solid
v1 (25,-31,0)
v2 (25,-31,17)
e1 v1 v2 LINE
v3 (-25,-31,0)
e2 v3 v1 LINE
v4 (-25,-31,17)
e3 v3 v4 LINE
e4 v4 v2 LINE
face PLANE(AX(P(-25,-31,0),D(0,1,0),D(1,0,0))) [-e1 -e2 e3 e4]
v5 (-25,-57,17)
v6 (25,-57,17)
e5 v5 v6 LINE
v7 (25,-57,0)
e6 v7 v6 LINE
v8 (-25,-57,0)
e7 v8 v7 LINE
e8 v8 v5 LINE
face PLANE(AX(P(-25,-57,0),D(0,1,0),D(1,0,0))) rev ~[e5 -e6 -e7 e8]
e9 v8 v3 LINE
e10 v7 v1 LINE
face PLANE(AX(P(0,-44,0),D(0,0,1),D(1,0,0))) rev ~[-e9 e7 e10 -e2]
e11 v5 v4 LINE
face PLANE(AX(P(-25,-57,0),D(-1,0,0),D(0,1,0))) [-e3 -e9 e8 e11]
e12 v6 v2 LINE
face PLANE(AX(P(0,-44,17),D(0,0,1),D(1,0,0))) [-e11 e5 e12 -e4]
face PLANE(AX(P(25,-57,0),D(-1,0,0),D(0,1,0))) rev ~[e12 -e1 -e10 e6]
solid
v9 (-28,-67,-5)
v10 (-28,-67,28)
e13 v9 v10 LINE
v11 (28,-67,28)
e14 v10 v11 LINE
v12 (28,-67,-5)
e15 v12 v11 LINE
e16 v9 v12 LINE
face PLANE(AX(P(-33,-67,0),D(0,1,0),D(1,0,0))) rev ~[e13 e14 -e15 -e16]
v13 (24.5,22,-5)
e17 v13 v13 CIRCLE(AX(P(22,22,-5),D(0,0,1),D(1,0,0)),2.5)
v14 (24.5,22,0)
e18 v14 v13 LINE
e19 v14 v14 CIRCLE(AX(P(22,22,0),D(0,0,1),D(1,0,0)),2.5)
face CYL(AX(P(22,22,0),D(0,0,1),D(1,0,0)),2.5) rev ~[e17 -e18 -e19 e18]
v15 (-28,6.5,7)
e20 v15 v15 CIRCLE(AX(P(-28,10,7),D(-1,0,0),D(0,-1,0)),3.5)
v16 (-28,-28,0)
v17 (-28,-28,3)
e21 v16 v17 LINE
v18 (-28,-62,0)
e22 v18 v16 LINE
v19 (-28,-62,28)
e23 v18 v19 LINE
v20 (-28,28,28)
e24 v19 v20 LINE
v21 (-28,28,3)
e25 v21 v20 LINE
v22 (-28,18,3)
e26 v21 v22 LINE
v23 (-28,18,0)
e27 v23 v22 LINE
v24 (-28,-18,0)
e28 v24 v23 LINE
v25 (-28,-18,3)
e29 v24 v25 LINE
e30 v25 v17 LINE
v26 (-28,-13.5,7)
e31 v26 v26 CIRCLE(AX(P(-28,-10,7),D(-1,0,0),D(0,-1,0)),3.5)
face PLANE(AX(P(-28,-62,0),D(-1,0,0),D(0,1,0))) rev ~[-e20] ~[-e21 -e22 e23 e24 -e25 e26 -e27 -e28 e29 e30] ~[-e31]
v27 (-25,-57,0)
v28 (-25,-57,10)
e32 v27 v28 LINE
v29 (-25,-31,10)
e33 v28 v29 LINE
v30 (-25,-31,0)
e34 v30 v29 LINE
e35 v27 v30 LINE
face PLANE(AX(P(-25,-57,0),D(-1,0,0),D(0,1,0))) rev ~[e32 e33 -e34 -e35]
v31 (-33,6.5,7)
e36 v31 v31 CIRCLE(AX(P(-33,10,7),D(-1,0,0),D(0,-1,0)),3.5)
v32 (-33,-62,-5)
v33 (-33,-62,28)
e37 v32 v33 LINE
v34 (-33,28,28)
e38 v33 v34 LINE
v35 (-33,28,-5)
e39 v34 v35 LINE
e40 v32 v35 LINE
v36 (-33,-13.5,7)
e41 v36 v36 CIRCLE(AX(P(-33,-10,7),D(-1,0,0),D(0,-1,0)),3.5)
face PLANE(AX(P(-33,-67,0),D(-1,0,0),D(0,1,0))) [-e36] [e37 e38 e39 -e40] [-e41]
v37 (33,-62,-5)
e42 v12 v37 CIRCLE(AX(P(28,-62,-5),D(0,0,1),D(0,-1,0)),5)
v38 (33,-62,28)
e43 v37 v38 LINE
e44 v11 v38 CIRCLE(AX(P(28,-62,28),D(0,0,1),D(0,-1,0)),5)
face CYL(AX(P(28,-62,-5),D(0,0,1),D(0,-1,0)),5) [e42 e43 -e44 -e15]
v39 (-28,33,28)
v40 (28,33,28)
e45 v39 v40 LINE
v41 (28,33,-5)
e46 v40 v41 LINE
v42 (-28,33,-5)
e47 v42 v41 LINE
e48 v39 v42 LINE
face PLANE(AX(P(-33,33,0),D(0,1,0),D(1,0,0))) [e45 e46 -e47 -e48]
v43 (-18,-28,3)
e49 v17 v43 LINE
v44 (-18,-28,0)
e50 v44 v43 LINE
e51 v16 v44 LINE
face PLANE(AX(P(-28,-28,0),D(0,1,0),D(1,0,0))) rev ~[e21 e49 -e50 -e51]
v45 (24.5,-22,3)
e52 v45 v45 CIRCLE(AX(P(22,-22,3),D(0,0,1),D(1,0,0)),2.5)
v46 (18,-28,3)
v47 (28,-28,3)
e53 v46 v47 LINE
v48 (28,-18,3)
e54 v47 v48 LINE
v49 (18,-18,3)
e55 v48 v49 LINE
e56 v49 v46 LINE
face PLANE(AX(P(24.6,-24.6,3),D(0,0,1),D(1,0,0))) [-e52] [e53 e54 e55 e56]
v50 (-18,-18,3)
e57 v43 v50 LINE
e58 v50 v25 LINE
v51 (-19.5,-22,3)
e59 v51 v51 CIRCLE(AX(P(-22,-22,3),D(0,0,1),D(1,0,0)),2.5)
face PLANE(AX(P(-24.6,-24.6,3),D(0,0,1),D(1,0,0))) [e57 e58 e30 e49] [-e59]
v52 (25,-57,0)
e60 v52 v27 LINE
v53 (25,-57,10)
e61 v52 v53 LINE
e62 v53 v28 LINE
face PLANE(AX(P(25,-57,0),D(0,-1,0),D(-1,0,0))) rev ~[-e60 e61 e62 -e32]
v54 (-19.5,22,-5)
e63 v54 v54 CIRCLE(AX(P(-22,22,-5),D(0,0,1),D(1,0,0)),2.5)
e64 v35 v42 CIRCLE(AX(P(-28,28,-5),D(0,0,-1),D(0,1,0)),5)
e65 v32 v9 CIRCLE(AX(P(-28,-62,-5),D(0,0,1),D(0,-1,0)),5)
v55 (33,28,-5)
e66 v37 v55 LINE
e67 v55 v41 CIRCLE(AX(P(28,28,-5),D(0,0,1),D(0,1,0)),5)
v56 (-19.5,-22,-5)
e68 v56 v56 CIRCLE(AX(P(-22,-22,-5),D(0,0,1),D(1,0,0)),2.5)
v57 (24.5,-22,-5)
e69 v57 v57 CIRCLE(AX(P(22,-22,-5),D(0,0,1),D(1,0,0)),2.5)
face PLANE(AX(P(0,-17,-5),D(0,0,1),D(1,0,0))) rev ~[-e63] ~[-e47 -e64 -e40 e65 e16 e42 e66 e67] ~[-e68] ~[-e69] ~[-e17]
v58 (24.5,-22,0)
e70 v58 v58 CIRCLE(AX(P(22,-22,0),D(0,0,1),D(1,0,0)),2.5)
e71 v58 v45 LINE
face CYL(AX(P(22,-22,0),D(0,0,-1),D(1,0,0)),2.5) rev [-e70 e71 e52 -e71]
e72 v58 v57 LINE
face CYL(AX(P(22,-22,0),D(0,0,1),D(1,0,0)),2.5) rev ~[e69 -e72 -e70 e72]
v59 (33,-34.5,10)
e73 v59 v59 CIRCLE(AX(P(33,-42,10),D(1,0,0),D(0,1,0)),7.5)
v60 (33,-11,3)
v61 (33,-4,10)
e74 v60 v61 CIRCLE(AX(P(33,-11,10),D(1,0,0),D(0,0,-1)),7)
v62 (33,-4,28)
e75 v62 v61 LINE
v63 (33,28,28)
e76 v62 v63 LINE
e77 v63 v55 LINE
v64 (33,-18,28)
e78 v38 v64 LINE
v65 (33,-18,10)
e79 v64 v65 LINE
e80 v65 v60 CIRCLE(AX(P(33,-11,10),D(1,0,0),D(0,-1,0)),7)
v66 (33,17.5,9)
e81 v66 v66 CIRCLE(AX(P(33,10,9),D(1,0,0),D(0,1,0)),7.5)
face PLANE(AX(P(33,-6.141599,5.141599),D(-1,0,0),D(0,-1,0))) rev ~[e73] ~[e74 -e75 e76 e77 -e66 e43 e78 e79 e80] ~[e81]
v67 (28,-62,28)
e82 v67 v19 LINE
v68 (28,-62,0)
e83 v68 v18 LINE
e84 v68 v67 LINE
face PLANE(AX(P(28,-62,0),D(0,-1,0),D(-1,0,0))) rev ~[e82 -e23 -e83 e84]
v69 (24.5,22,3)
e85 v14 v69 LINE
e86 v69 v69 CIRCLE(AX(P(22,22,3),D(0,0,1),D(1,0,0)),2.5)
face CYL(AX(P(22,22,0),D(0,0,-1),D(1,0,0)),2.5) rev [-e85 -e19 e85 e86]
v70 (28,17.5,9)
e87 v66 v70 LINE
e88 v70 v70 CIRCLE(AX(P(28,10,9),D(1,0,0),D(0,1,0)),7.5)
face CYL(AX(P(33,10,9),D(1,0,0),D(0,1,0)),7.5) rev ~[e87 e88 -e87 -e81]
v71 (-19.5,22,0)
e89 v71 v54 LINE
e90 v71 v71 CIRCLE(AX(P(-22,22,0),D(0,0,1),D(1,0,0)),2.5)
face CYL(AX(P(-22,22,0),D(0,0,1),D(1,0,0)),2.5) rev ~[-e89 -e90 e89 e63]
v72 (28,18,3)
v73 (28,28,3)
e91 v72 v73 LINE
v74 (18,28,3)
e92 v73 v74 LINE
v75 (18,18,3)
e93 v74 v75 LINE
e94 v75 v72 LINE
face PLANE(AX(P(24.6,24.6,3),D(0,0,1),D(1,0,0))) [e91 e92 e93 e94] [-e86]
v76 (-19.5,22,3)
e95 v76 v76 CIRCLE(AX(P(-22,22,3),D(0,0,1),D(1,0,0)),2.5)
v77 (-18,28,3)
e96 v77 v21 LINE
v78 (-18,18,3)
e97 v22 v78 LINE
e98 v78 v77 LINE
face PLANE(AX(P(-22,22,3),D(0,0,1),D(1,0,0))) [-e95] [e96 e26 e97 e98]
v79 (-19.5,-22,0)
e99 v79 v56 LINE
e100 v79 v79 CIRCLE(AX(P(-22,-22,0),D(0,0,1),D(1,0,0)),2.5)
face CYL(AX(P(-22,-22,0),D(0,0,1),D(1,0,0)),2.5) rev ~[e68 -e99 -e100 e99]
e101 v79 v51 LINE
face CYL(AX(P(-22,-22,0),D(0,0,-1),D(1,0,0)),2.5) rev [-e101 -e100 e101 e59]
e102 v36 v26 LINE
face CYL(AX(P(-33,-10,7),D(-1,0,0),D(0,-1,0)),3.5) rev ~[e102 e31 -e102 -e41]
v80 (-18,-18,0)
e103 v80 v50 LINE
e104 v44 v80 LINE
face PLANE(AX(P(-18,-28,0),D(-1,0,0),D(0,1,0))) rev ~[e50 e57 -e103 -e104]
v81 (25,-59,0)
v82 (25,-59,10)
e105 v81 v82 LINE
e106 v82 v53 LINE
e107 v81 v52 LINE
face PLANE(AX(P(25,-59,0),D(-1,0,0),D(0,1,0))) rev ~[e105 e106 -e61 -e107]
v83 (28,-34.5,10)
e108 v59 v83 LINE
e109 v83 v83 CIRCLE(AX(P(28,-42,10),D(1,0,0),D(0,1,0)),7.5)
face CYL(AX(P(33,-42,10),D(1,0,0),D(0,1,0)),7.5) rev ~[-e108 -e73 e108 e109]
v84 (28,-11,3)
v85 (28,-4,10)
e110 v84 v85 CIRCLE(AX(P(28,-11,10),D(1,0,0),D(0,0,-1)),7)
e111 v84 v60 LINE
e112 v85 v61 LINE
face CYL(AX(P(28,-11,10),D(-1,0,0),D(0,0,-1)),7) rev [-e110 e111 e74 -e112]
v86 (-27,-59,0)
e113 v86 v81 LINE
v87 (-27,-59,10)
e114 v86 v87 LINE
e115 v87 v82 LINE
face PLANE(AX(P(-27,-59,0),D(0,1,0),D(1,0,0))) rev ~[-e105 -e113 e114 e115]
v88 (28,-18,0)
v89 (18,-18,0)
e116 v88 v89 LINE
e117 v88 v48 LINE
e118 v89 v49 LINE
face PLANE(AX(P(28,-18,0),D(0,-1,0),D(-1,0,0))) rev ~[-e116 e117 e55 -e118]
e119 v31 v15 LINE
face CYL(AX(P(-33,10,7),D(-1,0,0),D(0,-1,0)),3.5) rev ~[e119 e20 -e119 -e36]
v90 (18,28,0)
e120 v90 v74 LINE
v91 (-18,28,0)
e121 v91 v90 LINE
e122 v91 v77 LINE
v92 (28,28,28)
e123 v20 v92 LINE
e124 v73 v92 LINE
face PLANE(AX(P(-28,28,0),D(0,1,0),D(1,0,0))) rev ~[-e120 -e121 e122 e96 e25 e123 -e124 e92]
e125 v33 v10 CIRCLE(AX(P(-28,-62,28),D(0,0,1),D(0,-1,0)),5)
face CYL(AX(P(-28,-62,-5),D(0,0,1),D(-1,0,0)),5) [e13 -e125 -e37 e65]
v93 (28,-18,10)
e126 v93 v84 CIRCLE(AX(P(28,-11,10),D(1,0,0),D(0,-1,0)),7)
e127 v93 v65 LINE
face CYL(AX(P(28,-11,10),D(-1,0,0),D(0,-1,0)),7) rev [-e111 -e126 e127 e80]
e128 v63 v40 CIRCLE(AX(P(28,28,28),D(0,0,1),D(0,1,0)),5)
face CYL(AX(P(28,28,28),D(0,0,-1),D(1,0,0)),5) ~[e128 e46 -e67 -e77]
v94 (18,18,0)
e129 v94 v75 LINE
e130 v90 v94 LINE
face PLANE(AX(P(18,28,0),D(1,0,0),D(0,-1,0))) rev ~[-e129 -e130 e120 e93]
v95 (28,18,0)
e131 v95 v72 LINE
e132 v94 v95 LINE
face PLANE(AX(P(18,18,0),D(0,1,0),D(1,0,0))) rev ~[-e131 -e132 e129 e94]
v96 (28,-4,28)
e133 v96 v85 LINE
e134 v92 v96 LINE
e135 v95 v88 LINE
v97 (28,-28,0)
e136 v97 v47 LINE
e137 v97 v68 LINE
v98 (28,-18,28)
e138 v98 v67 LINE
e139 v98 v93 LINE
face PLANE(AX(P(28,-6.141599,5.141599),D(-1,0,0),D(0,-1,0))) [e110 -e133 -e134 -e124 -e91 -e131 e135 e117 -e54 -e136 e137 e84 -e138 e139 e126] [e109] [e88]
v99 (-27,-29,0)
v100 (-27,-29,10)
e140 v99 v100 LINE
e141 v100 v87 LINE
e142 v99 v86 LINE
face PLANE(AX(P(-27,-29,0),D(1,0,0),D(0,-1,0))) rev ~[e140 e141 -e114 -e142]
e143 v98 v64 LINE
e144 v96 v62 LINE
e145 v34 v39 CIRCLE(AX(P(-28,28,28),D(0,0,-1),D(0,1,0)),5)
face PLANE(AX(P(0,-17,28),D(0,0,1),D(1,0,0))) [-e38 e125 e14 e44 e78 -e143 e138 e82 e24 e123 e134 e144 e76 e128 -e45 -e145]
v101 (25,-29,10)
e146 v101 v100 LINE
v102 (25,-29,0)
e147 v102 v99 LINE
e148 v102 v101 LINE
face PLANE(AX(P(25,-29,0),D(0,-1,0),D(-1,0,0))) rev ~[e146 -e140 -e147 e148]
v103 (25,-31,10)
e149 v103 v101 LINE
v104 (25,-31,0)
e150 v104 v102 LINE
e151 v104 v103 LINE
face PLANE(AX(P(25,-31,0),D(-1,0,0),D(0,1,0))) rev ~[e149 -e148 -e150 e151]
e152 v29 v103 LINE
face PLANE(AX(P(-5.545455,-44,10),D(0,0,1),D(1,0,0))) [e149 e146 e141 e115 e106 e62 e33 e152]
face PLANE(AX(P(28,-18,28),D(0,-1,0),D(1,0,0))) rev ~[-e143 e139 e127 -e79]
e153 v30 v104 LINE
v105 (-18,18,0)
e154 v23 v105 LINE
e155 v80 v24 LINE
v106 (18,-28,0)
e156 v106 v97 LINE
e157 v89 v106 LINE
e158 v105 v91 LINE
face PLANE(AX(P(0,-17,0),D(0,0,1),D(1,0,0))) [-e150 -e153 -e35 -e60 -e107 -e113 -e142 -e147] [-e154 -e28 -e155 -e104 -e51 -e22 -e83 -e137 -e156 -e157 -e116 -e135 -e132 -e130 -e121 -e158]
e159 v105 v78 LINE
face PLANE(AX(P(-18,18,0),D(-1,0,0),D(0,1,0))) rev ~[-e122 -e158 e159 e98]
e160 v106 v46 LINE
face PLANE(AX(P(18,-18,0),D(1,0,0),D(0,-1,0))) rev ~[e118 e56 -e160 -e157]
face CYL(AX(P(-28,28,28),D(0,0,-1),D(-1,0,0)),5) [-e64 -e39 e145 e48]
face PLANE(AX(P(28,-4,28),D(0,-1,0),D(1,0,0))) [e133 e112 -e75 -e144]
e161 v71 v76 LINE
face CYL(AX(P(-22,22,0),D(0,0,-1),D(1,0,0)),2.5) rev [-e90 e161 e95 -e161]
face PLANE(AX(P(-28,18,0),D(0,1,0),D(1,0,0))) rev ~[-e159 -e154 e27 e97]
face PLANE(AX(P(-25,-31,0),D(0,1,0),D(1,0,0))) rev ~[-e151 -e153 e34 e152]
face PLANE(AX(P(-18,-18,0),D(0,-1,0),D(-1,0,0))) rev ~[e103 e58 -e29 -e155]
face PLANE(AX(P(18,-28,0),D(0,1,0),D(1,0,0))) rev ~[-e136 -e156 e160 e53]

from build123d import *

# Parameters (mm, degrees)
F0_W         = 66
F0_H         = 100
F0_W_2       = 50
F0_H_2       = 26
F0_W_3       = 15
F0_H_3       = 12
F0_W_4       = 14
F0_H_4       = 10
F0_W_5       = 36
F0_H_5       = 2
F0_W_6       = 8
F0_H_6       = 8
F0_R         = 2.5
F1_DEPTH     = 5
F2_DEPTH     = 28
F3_DEPTH     = 3
F5_DEPTH     = 17
F6_R         = 5
F7_DEPTH     = 25
F8_R         = 7.5
F9_DEPTH     = 25
F10_DEPTH    = 10
F4_W         = 5
F4_H         = 14
F11_DEPTH    = 25
F12_T1_DEPTH = 5
F13_R        = 3.5
F14_DEPTH    = 25


# Not quite as in the source:
# - a fillet or chamfer that OpenCascade refuses, or shapes differently, is made with other operations: its cross-section is extruded or revolved along the edge and cut away or added


with BuildPart() as f1:
    # F0 (on Top) → F1 (new body)
    with BuildSketch(Plane.XY):
        with Locations((0, -17)):
            Rectangle(F0_W, F0_H)
        Polygon((-18, 28), (18, 28), (28, 28), (28, 18), (28, -18), (28, -28), (28, -62), (-28, -62), (-28, -28), (-28, -18), (-28, 18), (-28, 28), align=None, mode=Mode.SUBTRACT)
        Polygon((28, -62), (28, -28), (18, -28), (-18, -28), (-28, -28), (-28, -62), align=None)
        Polygon((25, -31), (25, -57), (25, -59), (-27, -59), (-27, -29), (25, -29), align=None, mode=Mode.SUBTRACT)
        Polygon((18, 18), (18, 26), (-18, 26), (-18, 18), (-26, 18), (-26, 16), (-11, 16), (-11, 4), (-26, 4), (-26, -4), (-11, -4), (-11, -16), (-26, -16), (-26, -18), (-18, -18), (-18, -26), (18, -26), (18, -18), (13, -18), (13, -4), (26, -4), (26, 5), (12, 5), (12, 15), (26, 15), (26, 18), align=None)
        Polygon((-4, 9), (1, 9), (1, 4), (1, -1), (-4, -1), (-9, -1), (-9, 4), (-9, 9), align=None, mode=Mode.SUBTRACT)
        with Locations((0, -44)):
            Rectangle(F0_W_2, F0_H_2)
        Polygon((25, -59), (25, -57), (-25, -57), (-25, -31), (25, -31), (25, -29), (-27, -29), (-27, -59), align=None)
        Polygon((26, -18), (26, -4), (13, -4), (13, -18), (18, -18), align=None)
        with Locations((-18.5, -10)):
            Rectangle(F0_W_3, F0_H_3)
        with Locations((-18.5, 10)):
            Rectangle(F0_W_3, F0_H_3)
        with Locations((19, 10)):
            Rectangle(F0_W_4, F0_H_4)
        with BuildLine():
            ThreePointArc((1, 4), (-0.4644660941, 7.5355339059), (-4, 9))
            ThreePointArc((-4, 9), (-7.5355339059, 7.5355339059), (-9, 4))
            ThreePointArc((-9, 4), (-7.5355339059, 0.4644660941), (-4, -1))
            ThreePointArc((-4, -1), (-0.4644660941, 0.4644660941), (1, 4))
        make_face()
        with Locations((0, 27)):
            Rectangle(F0_W_5, F0_H_5)
        Polygon((28, 18), (26, 18), (26, 15), (26, 5), (26, -4), (26, -18), (28, -18), align=None)
        with Locations((0, -27)):
            Rectangle(F0_W_5, F0_H_5)
        Polygon((-26, 16), (-26, 18), (-28, 18), (-28, -18), (-26, -18), (-26, -16), (-26, -4), (-26, 4), align=None)
        with Locations((-22, 22)):
            Rectangle(F0_W_6, F0_H_6)
        with Locations((-22, 22)):
            Circle(F0_R, mode=Mode.SUBTRACT)
        with Locations((22, 22)):
            Rectangle(F0_W_6, F0_H_6)
        with Locations((22, 22)):
            Circle(F0_R, mode=Mode.SUBTRACT)
        with Locations((22, -22)):
            Rectangle(F0_W_6, F0_H_6)
        with Locations((22, -22)):
            Circle(F0_R, mode=Mode.SUBTRACT)
        with Locations((-22, -22)):
            Rectangle(F0_W_6, F0_H_6)
        with Locations((-22, -22)):
            Circle(F0_R, mode=Mode.SUBTRACT)
        Polygon((-26, 26), (-18, 26), (-18, 28), (-28, 28), (-28, 18), (-26, 18), align=None)
        Polygon((18, 26), (26, 26), (26, 18), (28, 18), (28, 28), (18, 28), align=None)
        Polygon((28, -28), (28, -18), (26, -18), (26, -26), (18, -26), (18, -28), align=None)
        Polygon((-26, -18), (-28, -18), (-28, -28), (-18, -28), (-18, -26), (-26, -26), align=None)
        with Locations((-22, 22)):
            Circle(F0_R)
        with Locations((-22, -22)):
            Circle(F0_R)
        with Locations((22, 22)):
            Circle(F0_R)
        with Locations((22, -22)):
            Circle(F0_R)
        with BuildLine():
            ThreePointArc((-4, -1), (-7.5355339059, 0.4644660941), (-9, 4))
            Line((-9, 4), (-9, -1))
            Line((-9, -1), (-4, -1))
        make_face()
        with BuildLine():
            Line((1, 4), (1, 9))
            Line((1, 9), (-4, 9))
            ThreePointArc((-4, 9), (-0.4644660941, 7.5355339059), (1, 4))
        make_face()
        with BuildLine():
            ThreePointArc((-9, 4), (-7.5355339059, 7.5355339059), (-4, 9))
            Line((-4, 9), (-9, 9))
            Line((-9, 9), (-9, 4))
        make_face()
        with BuildLine():
            Line((1, -1), (1, 4))
            ThreePointArc((1, 4), (-0.4644660941, 0.4644660941), (-4, -1))
            Line((-4, -1), (1, -1))
        make_face()
    extrude(amount=-F1_DEPTH)

    # F0 (on Top) → F2 (join)
    with BuildSketch(Plane.XY):
        with Locations((0, -17)):
            Rectangle(F0_W, F0_H)
        Polygon((-18, 28), (18, 28), (28, 28), (28, 18), (28, -18), (28, -28), (28, -62), (-28, -62), (-28, -28), (-28, -18), (-28, 18), (-28, 28), align=None, mode=Mode.SUBTRACT)
    extrude(amount=F2_DEPTH)

    # F0 (on Top) → F3 (join)
    with BuildSketch(Plane.XY):
        with Locations((-22, 22)):
            Rectangle(F0_W_6, F0_H_6)
        with Locations((-22, 22)):
            Circle(F0_R, mode=Mode.SUBTRACT)
        Polygon((-26, 26), (-18, 26), (-18, 28), (-28, 28), (-28, 18), (-26, 18), align=None)
        Polygon((18, 26), (26, 26), (26, 18), (28, 18), (28, 28), (18, 28), align=None)
        with Locations((22, 22)):
            Rectangle(F0_W_6, F0_H_6)
        with Locations((22, 22)):
            Circle(F0_R, mode=Mode.SUBTRACT)
        Polygon((-26, -18), (-28, -18), (-28, -28), (-18, -28), (-18, -26), (-26, -26), align=None)
        with Locations((-22, -22)):
            Rectangle(F0_W_6, F0_H_6)
        with Locations((-22, -22)):
            Circle(F0_R, mode=Mode.SUBTRACT)
        Polygon((28, -28), (28, -18), (26, -18), (26, -26), (18, -26), (18, -28), align=None)
        with Locations((22, -22)):
            Rectangle(F0_W_6, F0_H_6)
        with Locations((22, -22)):
            Circle(F0_R, mode=Mode.SUBTRACT)
    extrude(amount=F3_DEPTH)

    # F6
    f6_edges = [f1.edges().sort_by_distance(p)[0] for p in [
        (-33, 33, 11.5),
        (-33, -67, 11.5),
        (33, -67, 11.5),
        (33, 33, 11.5),
    ]]
    fillet(f6_edges, radius=F6_R)

    # F0 (on Top) → F7 (cut)
    with BuildSketch(Plane.XY):
        with Locations((22, 22)):
            Circle(F0_R)
        with Locations((22, -22)):
            Circle(F0_R)
        with Locations((-22, -22)):
            Circle(F0_R)
        with Locations((-22, 22)):
            Circle(F0_R)
    extrude(amount=-F7_DEPTH, mode=Mode.SUBTRACT)

    # F8 (on face) → F9 (cut)
    with BuildSketch(Plane.YZ.offset(33)):
        with Locations((-42, 10)):
            Circle(F8_R)
        with Locations((10, 9)):
            Circle(F8_R)
    extrude(amount=-F9_DEPTH, mode=Mode.SUBTRACT)

    # F0 (on Top) → F10 (join)
    with BuildSketch(Plane.XY):
        Polygon((25, -59), (25, -57), (-25, -57), (-25, -31), (25, -31), (25, -29), (-27, -29), (-27, -59), align=None)
    extrude(amount=F10_DEPTH)

    # F4 (on face) → F11 (cut)
    with BuildSketch(Plane.XY.offset(28)):
        with Locations((30.5, -11)):
            Rectangle(F4_W, F4_H)
    extrude(amount=-F11_DEPTH, mode=Mode.SUBTRACT)

    # F12: fillet of radius 7 on 2 edges, made by hand

    # F12_s2 → F12_t1 (join)
    with BuildSketch(Plane.YZ.offset(28)):
        with BuildLine():
            ThreePointArc((-11, 3), (-6.0502525317, 5.0502525317), (-4, 10))
            Line((-4, 10), (-4, 3))
            Line((-4, 3), (-11, 3))
        make_face()
        with BuildLine():
            ThreePointArc((-18, 10), (-15.9497474683, 5.0502525317), (-11, 3))
            Line((-11, 3), (-18, 3))
            Line((-18, 3), (-18, 10))
        make_face()
    extrude(amount=F12_T1_DEPTH)

    # F13 (on face) → F14 (cut)
    with BuildSketch(Plane(origin=(-33, 0, 0), x_dir=(0, -1, 0), z_dir=(-1, 0, 0))):
        with Locations((-10, 7)):
            Circle(F13_R)
        with Locations((10, 7)):
            Circle(F13_R)
    extrude(amount=-F14_DEPTH, mode=Mode.SUBTRACT)


with BuildPart() as f5:
    # F0 (on Top) → F5 (new body)
    with BuildSketch(Plane.XY):
        with Locations((0, -44)):
            Rectangle(F0_W_2, F0_H_2)
    extrude(amount=F5_DEPTH)


solid = Compound([f1.part, f5.part])
